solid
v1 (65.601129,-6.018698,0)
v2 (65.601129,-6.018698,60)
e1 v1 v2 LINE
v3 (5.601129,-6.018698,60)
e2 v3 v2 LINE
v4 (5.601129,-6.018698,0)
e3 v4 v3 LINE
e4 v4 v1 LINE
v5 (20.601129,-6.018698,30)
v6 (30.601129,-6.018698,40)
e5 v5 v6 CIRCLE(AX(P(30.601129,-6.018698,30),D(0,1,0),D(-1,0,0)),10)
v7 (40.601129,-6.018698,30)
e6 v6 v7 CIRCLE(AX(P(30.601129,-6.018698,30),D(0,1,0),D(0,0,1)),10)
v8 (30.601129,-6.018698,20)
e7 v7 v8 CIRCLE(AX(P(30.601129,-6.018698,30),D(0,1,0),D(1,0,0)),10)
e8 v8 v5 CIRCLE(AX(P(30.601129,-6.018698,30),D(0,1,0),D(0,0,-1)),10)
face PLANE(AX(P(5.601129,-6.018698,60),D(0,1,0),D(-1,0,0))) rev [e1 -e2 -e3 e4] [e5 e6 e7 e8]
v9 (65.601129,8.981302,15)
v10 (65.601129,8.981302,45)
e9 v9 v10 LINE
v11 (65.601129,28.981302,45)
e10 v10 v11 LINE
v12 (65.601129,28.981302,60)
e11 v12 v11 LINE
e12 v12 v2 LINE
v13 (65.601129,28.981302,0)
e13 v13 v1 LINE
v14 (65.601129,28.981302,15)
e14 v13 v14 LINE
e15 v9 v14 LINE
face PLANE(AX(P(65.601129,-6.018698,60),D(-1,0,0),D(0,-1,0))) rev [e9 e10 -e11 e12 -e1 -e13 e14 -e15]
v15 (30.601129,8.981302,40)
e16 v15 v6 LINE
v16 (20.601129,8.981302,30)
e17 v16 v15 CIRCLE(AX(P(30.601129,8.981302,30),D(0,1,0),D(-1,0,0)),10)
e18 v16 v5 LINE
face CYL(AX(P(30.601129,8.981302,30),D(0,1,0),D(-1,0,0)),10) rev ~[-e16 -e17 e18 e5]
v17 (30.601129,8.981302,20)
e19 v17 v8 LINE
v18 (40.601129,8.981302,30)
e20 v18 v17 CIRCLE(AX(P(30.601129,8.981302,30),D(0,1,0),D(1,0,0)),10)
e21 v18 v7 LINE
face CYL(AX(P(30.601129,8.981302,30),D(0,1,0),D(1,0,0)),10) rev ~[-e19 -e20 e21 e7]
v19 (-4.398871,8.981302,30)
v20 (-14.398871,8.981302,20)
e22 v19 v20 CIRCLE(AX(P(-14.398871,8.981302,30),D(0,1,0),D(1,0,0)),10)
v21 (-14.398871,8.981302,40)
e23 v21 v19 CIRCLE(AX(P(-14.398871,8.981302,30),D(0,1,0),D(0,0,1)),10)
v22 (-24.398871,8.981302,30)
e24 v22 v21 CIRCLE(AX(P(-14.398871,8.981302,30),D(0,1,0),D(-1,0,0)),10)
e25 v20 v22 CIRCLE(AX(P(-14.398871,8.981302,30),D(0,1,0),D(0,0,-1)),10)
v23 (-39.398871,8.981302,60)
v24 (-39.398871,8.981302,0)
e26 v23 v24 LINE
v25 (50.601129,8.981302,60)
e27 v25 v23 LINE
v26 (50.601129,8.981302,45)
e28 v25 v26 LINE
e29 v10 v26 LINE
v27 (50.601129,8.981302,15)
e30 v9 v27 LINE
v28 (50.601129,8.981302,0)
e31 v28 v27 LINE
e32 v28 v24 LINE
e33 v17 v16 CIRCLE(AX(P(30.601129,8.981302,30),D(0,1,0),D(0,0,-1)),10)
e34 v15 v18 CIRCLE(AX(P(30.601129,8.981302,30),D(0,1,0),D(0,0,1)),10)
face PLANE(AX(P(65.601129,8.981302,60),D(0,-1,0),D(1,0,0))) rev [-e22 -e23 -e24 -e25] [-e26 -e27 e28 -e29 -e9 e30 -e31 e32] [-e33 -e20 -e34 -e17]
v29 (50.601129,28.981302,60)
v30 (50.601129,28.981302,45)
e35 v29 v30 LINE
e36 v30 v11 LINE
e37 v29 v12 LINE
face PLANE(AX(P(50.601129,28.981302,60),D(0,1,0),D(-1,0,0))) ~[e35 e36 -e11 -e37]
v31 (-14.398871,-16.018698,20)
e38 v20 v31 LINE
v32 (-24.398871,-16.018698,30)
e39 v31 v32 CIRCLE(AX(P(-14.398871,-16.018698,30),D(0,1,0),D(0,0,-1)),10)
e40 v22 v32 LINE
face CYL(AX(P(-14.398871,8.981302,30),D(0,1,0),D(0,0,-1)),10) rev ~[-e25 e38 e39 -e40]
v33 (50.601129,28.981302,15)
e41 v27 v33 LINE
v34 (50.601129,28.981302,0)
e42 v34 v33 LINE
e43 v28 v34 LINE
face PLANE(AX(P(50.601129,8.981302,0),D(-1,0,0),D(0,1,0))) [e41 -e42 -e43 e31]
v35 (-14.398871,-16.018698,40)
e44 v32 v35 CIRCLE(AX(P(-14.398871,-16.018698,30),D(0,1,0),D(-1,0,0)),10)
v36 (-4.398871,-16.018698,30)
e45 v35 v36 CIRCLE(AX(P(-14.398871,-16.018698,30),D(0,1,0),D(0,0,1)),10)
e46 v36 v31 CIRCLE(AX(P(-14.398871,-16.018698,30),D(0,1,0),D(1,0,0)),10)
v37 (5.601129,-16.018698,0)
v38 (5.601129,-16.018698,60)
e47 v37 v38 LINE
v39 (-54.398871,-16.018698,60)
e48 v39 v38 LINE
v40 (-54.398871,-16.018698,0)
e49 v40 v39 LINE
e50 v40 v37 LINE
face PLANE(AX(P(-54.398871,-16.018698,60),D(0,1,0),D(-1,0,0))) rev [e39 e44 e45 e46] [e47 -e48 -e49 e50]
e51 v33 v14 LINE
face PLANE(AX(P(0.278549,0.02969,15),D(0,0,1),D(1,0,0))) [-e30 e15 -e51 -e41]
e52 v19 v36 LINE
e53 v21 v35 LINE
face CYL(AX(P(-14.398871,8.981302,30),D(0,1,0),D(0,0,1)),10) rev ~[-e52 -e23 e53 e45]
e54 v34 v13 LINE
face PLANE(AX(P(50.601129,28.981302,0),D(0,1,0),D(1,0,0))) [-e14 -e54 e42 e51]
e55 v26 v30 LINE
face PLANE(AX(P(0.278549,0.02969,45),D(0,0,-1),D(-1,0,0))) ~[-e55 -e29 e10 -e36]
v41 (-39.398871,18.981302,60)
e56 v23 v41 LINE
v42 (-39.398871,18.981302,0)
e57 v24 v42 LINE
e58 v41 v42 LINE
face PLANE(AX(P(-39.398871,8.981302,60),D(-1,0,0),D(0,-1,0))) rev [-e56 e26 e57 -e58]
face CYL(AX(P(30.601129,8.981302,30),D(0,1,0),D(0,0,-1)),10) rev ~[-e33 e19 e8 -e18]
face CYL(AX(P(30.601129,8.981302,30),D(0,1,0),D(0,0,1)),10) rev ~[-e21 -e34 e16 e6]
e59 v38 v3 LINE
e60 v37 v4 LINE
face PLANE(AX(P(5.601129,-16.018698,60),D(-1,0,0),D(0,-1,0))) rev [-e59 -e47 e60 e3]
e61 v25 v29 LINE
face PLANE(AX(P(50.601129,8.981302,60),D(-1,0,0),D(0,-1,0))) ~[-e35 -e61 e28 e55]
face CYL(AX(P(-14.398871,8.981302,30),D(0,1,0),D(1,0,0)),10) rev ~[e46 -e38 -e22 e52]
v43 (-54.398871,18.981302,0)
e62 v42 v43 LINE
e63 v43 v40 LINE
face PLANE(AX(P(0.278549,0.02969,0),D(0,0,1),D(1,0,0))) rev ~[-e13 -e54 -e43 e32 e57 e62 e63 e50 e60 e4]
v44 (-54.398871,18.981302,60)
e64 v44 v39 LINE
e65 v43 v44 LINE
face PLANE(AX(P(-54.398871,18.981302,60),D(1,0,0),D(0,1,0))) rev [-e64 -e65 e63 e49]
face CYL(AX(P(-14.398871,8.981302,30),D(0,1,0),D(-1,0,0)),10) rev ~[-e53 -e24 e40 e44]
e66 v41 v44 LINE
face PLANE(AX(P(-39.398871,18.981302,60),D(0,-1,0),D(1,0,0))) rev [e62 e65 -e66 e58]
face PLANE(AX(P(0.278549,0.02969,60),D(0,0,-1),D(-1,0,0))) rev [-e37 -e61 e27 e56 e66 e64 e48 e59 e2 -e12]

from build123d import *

# Parameters (mm, degrees)
F1_DEPTH = 30
F0_W     = 15
F0_H     = 20
F2_DEPTH = 15
F5_DEPTH = 25.001


with BuildPart() as f1:
    # F0 (on Top) → F1 (new body)
    with BuildSketch(Plane.XY):
        Polygon((-39.3988706533, 18.9813024559), (-54.3988706533, 18.9813024559), (-54.3988706533, -16.0186975441), (5.6011293467, -16.0186975441), (5.6011293467, -6.0186975441), (65.6011293467, -6.0186975441), (65.6011293467, 8.9813024559), (50.6011293467, 8.9813024559), (-39.3988706533, 8.9813024559), align=None)
    extrude(amount=F1_DEPTH)

    # F0 (on Top) → F2 (join)
    with BuildSketch(Plane.XY):
        Polygon((-39.3988706533, 18.9813024559), (-54.3988706533, 18.9813024559), (-54.3988706533, -16.0186975441), (5.6011293467, -16.0186975441), (5.6011293467, -6.0186975441), (65.6011293467, -6.0186975441), (65.6011293467, 8.9813024559), (50.6011293467, 8.9813024559), (-39.3988706533, 8.9813024559), align=None)
        with Locations((58.1011293467, 18.9813024559)):
            Rectangle(F0_W, F0_H)
    extrude(amount=F2_DEPTH)

    # F3: F1 across face


with BuildPart() as f1_1:
    add(f1.part)
    add(f1.part.mirror(Plane(origin=(-4.5459294768, -0.7245798971, 30), x_dir=(1, 0, 0), z_dir=(0, 0, 1))))

    # F4 (on face) → F5 (cut, through all)
    with BuildSketch(Plane(origin=(0, 8.9813024559, 0), x_dir=(-1, 0, 0), z_dir=(0, 1, 0))):
        with BuildLine():
            Line((-30.6011293467, 20), (-30.6011293467, 30))
            Line((-30.6011293467, 30), (-40.6011293467, 30))
            ThreePointArc((-40.6011293467, 30), (-37.6721971586, 22.9289321881), (-30.6011293467, 20))
        make_face()
        with BuildLine():
            Line((-20.6011293467, 30), (-30.6011293467, 30))
            Line((-30.6011293467, 30), (-30.6011293467, 20))
            ThreePointArc((-30.6011293467, 20), (-23.5300615349, 22.9289321881), (-20.6011293467, 30))
        make_face()
        with BuildLine():
            ThreePointArc((-20.6011293467, 30), (-23.5300615349, 37.0710678119), (-30.6011293467, 40))
            Line((-30.6011293467, 40), (-30.6011293467, 30))
            Line((-30.6011293467, 30), (-20.6011293467, 30))
        make_face()
        with BuildLine():
            Line((-30.6011293467, 30), (-30.6011293467, 40))
            ThreePointArc((-30.6011293467, 40), (-37.6721971586, 37.0710678119), (-40.6011293467, 30))
            Line((-40.6011293467, 30), (-30.6011293467, 30))
        make_face()
        with BuildLine():
            Line((24.3988706533, 30), (14.3988706533, 30))
            Line((14.3988706533, 30), (14.3988706533, 20))
            ThreePointArc((14.3988706533, 20), (21.4699384651, 22.9289321881), (24.3988706533, 30))
        make_face()
        with BuildLine():
            Line((14.3988706533, 30), (4.3988706533, 30))
            ThreePointArc((4.3988706533, 30), (7.3278028414, 22.9289321881), (14.3988706533, 20))
            Line((14.3988706533, 20), (14.3988706533, 30))
        make_face()
        with BuildLine():
            Line((14.3988706533, 30), (14.3988706533, 40))
            ThreePointArc((14.3988706533, 40), (7.3278028414, 37.0710678119), (4.3988706533, 30))
            Line((4.3988706533, 30), (14.3988706533, 30))
        make_face()
        with BuildLine():
            ThreePointArc((24.3988706533, 30), (21.4699384651, 37.0710678119), (14.3988706533, 40))
            Line((14.3988706533, 40), (14.3988706533, 30))
            Line((14.3988706533, 30), (24.3988706533, 30))
        make_face()
    extrude(amount=-F5_DEPTH, mode=Mode.SUBTRACT)


solid = f1_1.part
